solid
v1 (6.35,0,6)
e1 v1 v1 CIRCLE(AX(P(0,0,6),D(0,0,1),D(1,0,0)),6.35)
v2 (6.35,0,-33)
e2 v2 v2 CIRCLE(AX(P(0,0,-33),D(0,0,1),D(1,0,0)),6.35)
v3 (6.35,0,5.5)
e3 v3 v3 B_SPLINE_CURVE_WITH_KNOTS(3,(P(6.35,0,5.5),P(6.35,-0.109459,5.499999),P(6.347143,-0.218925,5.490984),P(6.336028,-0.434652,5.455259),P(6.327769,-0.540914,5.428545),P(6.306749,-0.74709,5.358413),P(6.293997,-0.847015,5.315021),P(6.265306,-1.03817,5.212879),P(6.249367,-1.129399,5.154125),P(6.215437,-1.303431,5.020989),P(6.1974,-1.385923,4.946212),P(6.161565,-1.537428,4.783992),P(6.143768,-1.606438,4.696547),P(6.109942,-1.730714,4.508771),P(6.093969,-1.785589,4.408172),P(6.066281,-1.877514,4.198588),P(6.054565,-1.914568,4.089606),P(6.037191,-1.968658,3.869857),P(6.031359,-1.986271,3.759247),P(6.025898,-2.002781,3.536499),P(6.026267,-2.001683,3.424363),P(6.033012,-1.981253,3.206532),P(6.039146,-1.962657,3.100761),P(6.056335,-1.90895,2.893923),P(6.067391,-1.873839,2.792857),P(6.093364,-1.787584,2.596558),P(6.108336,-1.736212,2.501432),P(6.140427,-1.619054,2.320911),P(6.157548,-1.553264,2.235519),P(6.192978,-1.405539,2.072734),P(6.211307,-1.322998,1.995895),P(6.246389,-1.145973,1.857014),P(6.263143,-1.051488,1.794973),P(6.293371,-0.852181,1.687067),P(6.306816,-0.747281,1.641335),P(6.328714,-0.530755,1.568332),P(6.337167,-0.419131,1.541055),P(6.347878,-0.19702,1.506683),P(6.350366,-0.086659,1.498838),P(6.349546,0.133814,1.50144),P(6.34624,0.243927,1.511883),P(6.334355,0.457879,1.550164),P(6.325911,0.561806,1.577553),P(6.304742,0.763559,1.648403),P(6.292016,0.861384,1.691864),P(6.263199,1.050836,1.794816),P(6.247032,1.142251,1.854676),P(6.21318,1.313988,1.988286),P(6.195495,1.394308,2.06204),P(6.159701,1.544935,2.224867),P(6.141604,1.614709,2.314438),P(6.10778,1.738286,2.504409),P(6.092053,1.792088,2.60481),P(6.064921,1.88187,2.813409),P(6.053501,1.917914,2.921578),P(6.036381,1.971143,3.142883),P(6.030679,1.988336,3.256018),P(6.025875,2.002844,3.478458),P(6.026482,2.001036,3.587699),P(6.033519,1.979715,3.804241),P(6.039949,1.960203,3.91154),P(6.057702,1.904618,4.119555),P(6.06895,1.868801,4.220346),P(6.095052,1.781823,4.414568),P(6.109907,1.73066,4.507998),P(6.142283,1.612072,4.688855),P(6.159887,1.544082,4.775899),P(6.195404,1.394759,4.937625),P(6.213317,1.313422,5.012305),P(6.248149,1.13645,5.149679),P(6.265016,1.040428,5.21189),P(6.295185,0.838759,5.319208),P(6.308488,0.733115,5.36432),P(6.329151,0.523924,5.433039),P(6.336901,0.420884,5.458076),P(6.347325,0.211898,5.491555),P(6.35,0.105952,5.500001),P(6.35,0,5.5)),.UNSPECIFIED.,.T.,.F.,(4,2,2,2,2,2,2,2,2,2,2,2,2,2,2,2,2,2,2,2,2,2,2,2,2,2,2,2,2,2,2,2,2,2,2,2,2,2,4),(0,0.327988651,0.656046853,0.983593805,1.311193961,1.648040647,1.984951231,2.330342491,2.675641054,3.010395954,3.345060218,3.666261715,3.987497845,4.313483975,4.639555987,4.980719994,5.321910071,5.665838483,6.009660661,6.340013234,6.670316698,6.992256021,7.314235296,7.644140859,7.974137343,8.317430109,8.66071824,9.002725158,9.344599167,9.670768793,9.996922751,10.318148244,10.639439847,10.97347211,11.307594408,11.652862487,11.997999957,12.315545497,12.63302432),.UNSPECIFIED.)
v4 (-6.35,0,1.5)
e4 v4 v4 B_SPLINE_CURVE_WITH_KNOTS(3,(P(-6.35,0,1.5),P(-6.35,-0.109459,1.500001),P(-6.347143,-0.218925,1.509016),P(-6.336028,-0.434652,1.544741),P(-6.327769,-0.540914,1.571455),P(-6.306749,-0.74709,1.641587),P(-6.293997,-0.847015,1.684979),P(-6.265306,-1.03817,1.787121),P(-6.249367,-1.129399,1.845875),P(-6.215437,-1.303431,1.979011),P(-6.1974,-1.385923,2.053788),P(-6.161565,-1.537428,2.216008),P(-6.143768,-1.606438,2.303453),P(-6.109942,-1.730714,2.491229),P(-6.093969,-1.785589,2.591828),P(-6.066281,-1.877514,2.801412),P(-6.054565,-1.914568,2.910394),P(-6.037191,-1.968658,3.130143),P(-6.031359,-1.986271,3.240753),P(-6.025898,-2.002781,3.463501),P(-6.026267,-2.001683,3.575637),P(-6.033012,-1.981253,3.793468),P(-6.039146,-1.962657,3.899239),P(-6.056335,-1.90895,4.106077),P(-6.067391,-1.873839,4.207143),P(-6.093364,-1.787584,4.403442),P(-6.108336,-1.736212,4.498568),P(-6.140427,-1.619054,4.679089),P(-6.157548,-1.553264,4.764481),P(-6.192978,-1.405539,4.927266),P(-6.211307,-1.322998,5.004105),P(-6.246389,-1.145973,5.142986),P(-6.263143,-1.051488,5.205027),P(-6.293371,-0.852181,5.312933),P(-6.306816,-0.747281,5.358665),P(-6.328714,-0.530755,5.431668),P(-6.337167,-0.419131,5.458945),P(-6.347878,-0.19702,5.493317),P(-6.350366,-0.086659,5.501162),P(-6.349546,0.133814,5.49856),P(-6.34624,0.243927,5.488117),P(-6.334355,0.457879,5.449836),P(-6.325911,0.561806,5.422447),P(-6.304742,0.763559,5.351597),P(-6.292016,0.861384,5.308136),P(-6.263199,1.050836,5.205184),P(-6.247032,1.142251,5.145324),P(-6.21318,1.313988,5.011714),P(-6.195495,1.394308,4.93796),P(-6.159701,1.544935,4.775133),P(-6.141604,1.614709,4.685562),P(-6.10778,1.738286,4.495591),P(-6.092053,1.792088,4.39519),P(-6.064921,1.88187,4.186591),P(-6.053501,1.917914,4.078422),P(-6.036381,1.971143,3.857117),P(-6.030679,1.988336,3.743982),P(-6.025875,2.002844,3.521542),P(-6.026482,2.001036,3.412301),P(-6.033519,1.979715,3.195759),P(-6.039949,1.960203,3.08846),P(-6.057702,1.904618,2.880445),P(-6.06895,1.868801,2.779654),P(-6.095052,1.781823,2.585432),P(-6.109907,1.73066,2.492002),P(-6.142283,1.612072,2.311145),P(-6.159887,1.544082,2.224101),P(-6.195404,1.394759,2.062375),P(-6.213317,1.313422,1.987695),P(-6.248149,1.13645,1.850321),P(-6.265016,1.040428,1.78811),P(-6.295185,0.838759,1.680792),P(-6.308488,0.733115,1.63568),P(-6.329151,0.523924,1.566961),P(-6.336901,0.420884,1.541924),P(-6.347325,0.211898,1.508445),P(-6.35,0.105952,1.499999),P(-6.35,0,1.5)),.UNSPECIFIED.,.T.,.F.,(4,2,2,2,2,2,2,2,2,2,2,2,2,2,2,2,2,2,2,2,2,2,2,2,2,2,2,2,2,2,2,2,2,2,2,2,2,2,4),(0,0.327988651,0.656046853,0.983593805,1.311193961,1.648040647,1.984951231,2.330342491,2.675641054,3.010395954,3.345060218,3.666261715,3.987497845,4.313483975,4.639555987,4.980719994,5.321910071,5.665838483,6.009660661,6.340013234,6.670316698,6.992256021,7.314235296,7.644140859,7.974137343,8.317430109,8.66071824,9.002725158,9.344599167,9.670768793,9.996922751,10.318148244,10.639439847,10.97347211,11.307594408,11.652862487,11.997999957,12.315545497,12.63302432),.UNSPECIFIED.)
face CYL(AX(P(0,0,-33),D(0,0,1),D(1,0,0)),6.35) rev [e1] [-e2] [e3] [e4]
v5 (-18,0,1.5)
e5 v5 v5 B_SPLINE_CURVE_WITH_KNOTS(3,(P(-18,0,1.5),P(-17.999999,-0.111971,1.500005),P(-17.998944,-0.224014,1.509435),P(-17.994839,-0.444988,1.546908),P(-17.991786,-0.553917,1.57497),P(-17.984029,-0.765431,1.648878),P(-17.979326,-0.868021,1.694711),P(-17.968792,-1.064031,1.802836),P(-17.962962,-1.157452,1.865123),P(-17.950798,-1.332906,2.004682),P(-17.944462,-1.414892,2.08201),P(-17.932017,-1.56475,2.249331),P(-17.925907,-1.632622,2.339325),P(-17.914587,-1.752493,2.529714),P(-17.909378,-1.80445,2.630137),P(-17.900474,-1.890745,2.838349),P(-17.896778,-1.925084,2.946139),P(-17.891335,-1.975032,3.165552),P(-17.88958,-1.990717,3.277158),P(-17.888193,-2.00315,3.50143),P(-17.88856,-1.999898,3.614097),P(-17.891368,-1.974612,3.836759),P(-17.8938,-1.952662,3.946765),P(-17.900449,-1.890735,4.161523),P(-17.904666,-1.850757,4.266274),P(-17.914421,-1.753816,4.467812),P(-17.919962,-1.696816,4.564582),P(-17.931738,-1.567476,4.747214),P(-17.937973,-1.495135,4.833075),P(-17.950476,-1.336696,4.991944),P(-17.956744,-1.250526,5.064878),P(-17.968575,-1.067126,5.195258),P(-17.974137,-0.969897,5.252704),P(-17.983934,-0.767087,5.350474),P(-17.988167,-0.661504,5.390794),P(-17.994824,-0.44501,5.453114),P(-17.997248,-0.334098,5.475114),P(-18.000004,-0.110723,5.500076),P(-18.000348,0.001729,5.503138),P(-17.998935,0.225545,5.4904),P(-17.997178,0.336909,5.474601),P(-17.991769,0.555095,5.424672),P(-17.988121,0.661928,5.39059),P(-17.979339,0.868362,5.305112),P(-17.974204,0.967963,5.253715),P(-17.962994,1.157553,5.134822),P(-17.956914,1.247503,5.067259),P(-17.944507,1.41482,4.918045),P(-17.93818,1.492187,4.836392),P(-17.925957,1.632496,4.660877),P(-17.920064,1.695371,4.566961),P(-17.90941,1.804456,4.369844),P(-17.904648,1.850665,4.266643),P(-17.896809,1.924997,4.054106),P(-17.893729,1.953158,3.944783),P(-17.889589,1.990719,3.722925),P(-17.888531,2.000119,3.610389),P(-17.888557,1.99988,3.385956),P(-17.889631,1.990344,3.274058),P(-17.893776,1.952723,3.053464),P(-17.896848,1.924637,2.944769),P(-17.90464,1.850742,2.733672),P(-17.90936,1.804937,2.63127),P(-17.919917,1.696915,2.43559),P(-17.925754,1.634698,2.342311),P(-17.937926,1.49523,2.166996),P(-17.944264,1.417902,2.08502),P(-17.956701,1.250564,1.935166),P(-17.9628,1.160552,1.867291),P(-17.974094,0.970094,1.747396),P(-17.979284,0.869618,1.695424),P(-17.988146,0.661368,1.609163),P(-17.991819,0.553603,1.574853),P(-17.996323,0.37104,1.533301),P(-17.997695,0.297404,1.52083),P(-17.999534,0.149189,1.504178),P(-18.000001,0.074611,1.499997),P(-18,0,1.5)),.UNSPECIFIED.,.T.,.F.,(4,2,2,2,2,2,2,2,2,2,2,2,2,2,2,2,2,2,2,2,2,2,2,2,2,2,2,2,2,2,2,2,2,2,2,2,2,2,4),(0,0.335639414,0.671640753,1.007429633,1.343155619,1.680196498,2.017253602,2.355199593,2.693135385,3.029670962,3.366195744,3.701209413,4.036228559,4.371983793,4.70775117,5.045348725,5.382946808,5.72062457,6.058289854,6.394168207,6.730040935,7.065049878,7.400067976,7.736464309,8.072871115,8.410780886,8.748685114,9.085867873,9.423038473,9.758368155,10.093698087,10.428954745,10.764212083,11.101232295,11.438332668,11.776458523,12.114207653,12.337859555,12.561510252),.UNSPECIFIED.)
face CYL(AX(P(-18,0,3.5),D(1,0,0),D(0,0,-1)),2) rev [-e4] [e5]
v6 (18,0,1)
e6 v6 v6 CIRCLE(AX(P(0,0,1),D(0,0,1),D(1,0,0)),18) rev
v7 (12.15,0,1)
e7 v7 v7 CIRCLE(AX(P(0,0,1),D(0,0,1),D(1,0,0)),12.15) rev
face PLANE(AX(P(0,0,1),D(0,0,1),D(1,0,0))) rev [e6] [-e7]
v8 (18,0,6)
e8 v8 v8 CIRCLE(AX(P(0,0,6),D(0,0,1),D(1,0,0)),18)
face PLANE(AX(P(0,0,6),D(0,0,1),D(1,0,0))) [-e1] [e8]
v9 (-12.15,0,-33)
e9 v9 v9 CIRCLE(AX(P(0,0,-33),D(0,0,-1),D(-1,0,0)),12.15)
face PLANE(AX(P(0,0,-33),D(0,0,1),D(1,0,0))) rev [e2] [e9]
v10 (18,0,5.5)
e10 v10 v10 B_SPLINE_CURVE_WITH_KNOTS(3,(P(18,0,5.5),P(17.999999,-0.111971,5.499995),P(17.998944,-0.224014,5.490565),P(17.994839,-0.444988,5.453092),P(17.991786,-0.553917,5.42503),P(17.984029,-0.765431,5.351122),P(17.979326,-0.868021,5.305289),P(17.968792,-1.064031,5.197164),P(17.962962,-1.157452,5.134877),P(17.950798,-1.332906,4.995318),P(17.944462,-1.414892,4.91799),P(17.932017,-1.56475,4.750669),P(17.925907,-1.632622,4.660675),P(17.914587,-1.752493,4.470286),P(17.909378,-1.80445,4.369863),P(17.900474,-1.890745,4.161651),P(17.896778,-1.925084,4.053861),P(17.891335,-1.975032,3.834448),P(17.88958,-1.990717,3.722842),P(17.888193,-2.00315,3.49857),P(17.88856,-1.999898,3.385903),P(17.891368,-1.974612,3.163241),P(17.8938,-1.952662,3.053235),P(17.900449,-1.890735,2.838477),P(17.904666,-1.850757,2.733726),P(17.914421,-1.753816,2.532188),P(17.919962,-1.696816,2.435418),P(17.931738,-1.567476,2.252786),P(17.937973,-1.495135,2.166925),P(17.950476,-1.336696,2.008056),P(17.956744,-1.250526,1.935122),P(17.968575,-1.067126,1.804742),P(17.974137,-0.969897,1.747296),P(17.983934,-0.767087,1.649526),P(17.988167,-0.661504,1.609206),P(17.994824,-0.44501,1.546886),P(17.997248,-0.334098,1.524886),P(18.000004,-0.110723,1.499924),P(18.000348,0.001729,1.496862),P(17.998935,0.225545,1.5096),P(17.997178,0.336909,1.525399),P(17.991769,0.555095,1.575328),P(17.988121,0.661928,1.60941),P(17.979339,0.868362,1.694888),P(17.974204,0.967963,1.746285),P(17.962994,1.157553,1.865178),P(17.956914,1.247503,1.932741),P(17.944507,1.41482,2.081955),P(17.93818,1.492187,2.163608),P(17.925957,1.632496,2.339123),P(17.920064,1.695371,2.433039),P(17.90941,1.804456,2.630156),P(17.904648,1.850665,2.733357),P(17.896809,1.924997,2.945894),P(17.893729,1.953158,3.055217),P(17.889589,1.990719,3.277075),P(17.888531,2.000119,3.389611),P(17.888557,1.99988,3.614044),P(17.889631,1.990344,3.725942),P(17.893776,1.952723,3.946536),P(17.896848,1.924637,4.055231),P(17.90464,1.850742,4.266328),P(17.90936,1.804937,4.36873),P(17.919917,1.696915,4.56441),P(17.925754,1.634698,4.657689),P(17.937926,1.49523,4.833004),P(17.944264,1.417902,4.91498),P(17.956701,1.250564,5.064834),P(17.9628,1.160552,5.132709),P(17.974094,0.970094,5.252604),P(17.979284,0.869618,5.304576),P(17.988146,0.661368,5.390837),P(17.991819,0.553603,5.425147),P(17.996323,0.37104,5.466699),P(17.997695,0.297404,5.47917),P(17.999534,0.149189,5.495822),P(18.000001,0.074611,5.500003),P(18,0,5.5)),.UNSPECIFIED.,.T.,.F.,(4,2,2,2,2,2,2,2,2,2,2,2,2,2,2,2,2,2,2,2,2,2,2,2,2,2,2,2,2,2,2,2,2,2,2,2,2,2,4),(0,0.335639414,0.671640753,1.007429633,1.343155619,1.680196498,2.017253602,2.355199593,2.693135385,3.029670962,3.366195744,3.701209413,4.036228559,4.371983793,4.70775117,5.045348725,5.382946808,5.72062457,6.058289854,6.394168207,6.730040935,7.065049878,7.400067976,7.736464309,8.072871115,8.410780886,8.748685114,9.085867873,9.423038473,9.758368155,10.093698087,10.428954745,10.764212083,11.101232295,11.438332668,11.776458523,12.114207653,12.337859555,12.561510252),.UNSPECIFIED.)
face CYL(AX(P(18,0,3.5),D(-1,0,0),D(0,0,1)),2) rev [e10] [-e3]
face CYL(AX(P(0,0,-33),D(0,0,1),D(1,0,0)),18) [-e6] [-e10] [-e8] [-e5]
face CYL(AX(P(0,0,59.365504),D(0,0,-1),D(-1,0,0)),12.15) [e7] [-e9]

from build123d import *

# Parameters (mm, degrees)
BOSS_EXTRUDE1_DEPTH      = 6
BOSS_EXTRUDE1_DEPTH_BACK = 33
SKETCH1_R                = 18
SKETCH1_R_2              = 6.35
CUT_EXTRUDE1_OUTLINE_W   = 2
CUT_EXTRUDE1_OUTLINE_H   = 11.973288181
CIRPATTERN1_COUNT        = 2
SKETCH2_OUTSIDE_W        = 50.826
SKETCH2_OUTSIDE_H        = 50.826
SKETCH2_OUTSIDE_R        = 12.15
CUT_EXTRUDE2_DEPTH       = 34


# Read off the part's stored shape, not the designer's step: Cut-Extrude1
with BuildPart() as part:
    # Sketch1 → Boss-Extrude1 (new, two sides: drawn at the far end of the back side and taken through both)
    with BuildSketch(Plane.XY.offset(-BOSS_EXTRUDE1_DEPTH_BACK)):
        Circle(SKETCH1_R)
        Circle(SKETCH1_R_2, mode=Mode.SUBTRACT)
    extrude(amount=BOSS_EXTRUDE1_DEPTH + BOSS_EXTRUDE1_DEPTH_BACK)

    # Cut-Extrude1 outline → Cut-Extrude1 (revolve, cut)
    with BuildSketch(Plane.YX.offset(-3.5)):
        with Locations((1, -12.013415915)):
            Rectangle(CUT_EXTRUDE1_OUTLINE_W, CUT_EXTRUDE1_OUTLINE_H)
    cut_extrude1 = revolve(axis=Axis((0, 0, 3.5), (1, 0, 0)), mode=Mode.SUBTRACT)

    # CirPattern1: Cut-Extrude1 ×2 about axis
    cirpattern1_axis = Axis((0, 0, 6), (0, 0, 1))
    for i in range(1, CIRPATTERN1_COUNT):
        add(cut_extrude1.rotate(cirpattern1_axis, i * 360 / CIRPATTERN1_COUNT), mode=Mode.SUBTRACT)

    # Sketch2 outside → Cut-Extrude2 (cut)
    with BuildSketch(Plane(origin=(0, 0, -33), x_dir=(-1, 0, 0), z_dir=(0, 0, -1))):
        Rectangle(SKETCH2_OUTSIDE_W, SKETCH2_OUTSIDE_H)
        Circle(SKETCH2_OUTSIDE_R, mode=Mode.SUBTRACT)
    extrude(amount=-CUT_EXTRUDE2_DEPTH, mode=Mode.SUBTRACT)


solid = part.part
